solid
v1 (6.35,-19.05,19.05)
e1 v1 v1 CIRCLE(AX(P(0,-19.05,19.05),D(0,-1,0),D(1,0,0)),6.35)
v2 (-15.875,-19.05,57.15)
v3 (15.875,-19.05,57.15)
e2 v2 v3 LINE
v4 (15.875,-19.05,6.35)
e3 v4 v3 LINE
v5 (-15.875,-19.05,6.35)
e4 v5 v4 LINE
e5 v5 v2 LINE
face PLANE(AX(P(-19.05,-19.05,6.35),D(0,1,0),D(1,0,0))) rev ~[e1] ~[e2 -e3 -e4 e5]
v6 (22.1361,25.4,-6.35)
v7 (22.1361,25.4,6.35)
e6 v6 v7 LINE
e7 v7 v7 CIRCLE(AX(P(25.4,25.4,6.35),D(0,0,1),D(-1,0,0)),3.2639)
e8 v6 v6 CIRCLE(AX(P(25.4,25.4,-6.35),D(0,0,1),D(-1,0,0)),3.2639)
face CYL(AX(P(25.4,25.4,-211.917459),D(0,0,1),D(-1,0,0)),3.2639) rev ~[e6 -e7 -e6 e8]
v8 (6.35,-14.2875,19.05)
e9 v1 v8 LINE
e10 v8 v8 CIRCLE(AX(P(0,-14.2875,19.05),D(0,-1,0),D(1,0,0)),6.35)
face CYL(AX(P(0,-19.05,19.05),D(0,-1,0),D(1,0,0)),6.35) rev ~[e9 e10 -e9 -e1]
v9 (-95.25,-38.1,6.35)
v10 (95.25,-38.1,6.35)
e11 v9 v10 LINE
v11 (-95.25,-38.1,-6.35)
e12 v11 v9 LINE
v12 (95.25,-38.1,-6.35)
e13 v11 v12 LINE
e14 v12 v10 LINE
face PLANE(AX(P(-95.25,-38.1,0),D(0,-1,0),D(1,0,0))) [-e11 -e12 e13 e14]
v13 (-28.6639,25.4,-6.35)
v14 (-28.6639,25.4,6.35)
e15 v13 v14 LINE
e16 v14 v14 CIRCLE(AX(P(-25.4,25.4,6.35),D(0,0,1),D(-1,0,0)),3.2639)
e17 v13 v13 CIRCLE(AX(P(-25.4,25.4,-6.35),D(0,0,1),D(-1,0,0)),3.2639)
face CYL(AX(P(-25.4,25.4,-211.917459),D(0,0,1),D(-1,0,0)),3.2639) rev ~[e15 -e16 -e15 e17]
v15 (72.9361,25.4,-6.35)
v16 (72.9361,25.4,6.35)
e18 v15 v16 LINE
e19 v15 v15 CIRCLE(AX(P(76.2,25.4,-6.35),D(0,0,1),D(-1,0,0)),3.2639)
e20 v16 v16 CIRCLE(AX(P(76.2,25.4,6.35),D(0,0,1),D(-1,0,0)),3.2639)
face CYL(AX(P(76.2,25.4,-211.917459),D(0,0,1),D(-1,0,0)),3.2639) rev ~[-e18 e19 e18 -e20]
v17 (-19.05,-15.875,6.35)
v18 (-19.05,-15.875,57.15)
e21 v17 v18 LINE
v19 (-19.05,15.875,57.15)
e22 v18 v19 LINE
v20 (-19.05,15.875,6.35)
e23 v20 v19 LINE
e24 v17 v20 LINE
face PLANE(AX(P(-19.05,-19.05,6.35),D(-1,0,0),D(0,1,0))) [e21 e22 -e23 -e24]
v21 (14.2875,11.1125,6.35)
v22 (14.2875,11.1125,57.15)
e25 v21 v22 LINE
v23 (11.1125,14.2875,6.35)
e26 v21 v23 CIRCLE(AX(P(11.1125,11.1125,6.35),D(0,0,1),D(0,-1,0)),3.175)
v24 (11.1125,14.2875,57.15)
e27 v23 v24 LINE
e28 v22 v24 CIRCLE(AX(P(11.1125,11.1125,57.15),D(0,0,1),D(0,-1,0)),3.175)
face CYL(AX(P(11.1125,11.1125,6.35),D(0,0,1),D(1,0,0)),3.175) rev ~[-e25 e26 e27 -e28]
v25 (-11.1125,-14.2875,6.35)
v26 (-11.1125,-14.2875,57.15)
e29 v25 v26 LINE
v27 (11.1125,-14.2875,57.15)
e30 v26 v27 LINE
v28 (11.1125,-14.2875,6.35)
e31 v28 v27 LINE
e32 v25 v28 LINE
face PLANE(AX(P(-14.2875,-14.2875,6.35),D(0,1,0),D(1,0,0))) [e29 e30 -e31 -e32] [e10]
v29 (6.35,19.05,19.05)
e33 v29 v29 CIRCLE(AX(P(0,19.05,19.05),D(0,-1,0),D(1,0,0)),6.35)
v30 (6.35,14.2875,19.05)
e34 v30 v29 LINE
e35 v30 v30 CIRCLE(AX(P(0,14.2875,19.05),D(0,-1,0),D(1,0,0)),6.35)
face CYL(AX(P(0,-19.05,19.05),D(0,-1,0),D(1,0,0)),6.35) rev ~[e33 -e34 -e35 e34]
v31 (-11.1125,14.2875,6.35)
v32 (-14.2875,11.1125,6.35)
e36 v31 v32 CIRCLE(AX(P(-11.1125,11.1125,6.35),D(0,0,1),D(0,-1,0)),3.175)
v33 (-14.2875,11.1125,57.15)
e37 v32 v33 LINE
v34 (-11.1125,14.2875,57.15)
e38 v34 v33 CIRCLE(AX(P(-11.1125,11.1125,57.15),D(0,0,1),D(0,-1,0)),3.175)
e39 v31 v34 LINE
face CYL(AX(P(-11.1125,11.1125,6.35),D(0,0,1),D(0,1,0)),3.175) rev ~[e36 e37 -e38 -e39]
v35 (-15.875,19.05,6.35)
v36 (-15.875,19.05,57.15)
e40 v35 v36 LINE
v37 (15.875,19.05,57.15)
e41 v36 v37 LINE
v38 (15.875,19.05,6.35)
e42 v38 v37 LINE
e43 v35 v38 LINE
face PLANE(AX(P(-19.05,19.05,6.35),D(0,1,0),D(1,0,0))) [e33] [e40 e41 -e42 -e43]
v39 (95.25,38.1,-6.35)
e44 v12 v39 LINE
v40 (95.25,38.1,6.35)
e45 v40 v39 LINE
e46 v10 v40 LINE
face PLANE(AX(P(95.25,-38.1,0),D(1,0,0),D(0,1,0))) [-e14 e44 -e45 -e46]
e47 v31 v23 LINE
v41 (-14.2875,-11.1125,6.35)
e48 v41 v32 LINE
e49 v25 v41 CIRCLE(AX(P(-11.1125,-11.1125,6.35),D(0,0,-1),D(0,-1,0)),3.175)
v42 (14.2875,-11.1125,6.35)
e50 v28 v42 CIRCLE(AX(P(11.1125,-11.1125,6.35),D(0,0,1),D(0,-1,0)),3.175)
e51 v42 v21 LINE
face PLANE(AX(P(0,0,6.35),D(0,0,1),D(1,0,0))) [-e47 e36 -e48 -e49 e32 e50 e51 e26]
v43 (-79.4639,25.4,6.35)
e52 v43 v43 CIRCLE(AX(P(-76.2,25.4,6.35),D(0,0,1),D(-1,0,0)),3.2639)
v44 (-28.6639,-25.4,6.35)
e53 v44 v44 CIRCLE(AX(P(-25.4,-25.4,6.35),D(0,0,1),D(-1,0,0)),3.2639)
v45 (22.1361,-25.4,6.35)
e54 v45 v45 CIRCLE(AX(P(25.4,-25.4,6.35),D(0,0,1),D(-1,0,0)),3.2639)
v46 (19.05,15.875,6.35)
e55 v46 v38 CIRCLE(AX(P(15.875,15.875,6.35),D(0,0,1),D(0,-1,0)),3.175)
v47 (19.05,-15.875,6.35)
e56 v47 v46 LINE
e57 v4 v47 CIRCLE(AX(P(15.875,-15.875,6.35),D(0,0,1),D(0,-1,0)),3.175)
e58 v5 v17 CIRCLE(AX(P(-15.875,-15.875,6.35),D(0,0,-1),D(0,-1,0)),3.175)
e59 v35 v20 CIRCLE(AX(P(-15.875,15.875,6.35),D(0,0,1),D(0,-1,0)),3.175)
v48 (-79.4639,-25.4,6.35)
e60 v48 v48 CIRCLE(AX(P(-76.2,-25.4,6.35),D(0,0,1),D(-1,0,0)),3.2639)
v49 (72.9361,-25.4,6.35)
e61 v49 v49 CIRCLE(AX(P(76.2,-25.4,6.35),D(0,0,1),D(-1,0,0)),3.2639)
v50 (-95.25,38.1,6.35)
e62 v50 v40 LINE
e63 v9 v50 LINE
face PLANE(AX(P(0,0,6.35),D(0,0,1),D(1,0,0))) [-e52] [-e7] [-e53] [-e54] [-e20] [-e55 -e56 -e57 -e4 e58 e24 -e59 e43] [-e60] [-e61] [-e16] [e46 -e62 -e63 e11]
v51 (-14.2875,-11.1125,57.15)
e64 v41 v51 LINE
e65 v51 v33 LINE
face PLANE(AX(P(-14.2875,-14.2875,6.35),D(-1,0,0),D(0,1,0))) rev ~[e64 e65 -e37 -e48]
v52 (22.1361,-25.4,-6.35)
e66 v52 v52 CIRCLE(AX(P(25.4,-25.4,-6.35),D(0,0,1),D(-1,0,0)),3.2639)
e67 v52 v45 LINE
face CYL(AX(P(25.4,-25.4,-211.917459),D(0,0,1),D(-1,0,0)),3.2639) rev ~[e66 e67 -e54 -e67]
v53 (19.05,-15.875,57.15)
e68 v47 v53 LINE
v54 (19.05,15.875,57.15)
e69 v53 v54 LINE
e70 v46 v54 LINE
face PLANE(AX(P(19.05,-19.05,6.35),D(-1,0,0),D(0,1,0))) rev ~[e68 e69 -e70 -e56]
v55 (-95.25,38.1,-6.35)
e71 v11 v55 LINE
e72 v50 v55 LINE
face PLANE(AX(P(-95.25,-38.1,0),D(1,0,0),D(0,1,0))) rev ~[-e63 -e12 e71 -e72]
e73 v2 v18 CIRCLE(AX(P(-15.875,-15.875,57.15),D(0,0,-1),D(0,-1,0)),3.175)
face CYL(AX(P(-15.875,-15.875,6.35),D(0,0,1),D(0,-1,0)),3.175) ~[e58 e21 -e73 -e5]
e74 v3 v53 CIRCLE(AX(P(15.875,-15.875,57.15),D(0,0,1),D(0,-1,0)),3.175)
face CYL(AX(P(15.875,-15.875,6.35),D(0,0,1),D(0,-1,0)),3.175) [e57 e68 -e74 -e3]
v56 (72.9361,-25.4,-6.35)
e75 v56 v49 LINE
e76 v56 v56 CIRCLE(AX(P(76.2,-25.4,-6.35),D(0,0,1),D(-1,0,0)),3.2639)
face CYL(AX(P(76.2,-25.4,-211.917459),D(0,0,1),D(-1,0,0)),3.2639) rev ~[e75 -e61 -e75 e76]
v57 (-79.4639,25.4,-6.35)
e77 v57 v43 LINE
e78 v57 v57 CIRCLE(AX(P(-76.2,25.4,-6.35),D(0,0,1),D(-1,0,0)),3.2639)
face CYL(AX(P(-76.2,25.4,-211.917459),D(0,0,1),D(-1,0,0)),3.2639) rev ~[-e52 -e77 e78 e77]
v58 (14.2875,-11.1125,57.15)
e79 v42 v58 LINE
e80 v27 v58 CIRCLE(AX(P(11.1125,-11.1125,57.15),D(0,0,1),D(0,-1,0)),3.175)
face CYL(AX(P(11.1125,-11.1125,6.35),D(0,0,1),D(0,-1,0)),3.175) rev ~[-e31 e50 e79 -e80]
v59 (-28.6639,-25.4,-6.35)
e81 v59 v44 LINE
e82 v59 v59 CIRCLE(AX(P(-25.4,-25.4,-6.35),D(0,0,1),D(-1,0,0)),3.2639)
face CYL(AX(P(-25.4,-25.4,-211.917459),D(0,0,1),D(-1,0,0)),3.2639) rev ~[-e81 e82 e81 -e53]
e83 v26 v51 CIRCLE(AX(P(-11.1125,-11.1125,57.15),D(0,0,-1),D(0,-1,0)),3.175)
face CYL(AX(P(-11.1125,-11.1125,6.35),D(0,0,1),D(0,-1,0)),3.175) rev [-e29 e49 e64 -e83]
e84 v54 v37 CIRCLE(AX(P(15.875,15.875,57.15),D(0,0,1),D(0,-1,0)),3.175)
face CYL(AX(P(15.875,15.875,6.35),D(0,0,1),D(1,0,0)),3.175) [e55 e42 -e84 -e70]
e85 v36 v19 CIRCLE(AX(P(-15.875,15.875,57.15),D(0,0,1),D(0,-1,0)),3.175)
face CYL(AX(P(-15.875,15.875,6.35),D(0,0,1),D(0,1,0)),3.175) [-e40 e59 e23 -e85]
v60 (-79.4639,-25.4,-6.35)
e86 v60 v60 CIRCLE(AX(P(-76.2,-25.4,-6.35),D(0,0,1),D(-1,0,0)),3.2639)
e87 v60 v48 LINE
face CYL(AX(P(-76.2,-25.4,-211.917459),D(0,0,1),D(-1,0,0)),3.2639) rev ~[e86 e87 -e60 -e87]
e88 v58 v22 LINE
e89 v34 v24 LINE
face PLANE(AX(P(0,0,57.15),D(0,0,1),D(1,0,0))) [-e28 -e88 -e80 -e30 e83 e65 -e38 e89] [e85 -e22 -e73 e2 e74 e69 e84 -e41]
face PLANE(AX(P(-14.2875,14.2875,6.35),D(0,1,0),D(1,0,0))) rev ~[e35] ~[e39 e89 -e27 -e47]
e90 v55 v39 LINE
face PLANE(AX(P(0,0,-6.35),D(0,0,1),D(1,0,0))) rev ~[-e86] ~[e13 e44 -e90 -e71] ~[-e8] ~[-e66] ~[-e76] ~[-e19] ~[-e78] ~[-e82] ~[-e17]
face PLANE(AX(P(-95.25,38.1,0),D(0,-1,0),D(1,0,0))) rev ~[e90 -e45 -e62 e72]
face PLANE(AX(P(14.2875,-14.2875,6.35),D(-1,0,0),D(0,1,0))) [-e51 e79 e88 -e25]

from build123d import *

# Parameters (mm, degrees)
F0_W     = 190.5
F0_H     = 76.2
F1_DEPTH = 6.35
F3_D     = 6.5278
F4_W     = 38.1
F4_H     = 38.1
F4_W_2   = 28.575
F4_H_2   = 28.575
F5_DEPTH = 50.8
F6_R     = 3.175
F7_R     = 6.35
F8_DEPTH = 38.1


# Not quite as in the source:
# - a feature names something its author has since deleted; it is built from what else it names


with BuildPart() as f1:
    # F0 (on Top) → F1 (new body, symmetric)
    with BuildSketch(Plane.XY):
        Rectangle(F0_W, F0_H)
    extrude(amount=F1_DEPTH, both=True)

    # F3 (through all)
    with Locations(Plane(origin=(0, 0, -6.35), x_dir=(1, 0, 0), z_dir=(0, 0, -1))):
        with Locations((-76.2, -25.4), (-25.4, -25.4), (-76.2, 25.4), (-25.4, 25.4), (25.4, 25.4), (25.4, -25.4), (76.2, -25.4), (76.2, 25.4)):
            Hole(F3_D / 2)

    # F4 (on face) → F5 (join)
    with BuildSketch(Plane.XY.offset(6.35)):
        Rectangle(F4_W, F4_H)
        Rectangle(F4_W_2, F4_H_2, mode=Mode.SUBTRACT)
    extrude(amount=F5_DEPTH)

    # F6
    f6_edges = [f1.edges().sort_by_distance(p)[0] for p in [
        (-19.05, -19.05, 31.75),
        (19.05, -19.05, 31.75),
        (-14.2875, 14.2875, 31.75),
        (14.2875, 14.2875, 31.75),
        (-14.2875, -14.2875, 31.75),
        (14.2875, -14.2875, 31.75),
        (-19.05, 19.05, 31.75),
        (19.05, 19.05, 31.75),
    ]]
    fillet(f6_edges, radius=F6_R)

    # F7 (on face) → F8 (cut, through all)
    with BuildSketch(Plane.XZ.offset(19.05)):
        with Locations((0, 19.05)):
            Circle(F7_R)
    extrude(amount=-F8_DEPTH, mode=Mode.SUBTRACT)


solid = f1.part
